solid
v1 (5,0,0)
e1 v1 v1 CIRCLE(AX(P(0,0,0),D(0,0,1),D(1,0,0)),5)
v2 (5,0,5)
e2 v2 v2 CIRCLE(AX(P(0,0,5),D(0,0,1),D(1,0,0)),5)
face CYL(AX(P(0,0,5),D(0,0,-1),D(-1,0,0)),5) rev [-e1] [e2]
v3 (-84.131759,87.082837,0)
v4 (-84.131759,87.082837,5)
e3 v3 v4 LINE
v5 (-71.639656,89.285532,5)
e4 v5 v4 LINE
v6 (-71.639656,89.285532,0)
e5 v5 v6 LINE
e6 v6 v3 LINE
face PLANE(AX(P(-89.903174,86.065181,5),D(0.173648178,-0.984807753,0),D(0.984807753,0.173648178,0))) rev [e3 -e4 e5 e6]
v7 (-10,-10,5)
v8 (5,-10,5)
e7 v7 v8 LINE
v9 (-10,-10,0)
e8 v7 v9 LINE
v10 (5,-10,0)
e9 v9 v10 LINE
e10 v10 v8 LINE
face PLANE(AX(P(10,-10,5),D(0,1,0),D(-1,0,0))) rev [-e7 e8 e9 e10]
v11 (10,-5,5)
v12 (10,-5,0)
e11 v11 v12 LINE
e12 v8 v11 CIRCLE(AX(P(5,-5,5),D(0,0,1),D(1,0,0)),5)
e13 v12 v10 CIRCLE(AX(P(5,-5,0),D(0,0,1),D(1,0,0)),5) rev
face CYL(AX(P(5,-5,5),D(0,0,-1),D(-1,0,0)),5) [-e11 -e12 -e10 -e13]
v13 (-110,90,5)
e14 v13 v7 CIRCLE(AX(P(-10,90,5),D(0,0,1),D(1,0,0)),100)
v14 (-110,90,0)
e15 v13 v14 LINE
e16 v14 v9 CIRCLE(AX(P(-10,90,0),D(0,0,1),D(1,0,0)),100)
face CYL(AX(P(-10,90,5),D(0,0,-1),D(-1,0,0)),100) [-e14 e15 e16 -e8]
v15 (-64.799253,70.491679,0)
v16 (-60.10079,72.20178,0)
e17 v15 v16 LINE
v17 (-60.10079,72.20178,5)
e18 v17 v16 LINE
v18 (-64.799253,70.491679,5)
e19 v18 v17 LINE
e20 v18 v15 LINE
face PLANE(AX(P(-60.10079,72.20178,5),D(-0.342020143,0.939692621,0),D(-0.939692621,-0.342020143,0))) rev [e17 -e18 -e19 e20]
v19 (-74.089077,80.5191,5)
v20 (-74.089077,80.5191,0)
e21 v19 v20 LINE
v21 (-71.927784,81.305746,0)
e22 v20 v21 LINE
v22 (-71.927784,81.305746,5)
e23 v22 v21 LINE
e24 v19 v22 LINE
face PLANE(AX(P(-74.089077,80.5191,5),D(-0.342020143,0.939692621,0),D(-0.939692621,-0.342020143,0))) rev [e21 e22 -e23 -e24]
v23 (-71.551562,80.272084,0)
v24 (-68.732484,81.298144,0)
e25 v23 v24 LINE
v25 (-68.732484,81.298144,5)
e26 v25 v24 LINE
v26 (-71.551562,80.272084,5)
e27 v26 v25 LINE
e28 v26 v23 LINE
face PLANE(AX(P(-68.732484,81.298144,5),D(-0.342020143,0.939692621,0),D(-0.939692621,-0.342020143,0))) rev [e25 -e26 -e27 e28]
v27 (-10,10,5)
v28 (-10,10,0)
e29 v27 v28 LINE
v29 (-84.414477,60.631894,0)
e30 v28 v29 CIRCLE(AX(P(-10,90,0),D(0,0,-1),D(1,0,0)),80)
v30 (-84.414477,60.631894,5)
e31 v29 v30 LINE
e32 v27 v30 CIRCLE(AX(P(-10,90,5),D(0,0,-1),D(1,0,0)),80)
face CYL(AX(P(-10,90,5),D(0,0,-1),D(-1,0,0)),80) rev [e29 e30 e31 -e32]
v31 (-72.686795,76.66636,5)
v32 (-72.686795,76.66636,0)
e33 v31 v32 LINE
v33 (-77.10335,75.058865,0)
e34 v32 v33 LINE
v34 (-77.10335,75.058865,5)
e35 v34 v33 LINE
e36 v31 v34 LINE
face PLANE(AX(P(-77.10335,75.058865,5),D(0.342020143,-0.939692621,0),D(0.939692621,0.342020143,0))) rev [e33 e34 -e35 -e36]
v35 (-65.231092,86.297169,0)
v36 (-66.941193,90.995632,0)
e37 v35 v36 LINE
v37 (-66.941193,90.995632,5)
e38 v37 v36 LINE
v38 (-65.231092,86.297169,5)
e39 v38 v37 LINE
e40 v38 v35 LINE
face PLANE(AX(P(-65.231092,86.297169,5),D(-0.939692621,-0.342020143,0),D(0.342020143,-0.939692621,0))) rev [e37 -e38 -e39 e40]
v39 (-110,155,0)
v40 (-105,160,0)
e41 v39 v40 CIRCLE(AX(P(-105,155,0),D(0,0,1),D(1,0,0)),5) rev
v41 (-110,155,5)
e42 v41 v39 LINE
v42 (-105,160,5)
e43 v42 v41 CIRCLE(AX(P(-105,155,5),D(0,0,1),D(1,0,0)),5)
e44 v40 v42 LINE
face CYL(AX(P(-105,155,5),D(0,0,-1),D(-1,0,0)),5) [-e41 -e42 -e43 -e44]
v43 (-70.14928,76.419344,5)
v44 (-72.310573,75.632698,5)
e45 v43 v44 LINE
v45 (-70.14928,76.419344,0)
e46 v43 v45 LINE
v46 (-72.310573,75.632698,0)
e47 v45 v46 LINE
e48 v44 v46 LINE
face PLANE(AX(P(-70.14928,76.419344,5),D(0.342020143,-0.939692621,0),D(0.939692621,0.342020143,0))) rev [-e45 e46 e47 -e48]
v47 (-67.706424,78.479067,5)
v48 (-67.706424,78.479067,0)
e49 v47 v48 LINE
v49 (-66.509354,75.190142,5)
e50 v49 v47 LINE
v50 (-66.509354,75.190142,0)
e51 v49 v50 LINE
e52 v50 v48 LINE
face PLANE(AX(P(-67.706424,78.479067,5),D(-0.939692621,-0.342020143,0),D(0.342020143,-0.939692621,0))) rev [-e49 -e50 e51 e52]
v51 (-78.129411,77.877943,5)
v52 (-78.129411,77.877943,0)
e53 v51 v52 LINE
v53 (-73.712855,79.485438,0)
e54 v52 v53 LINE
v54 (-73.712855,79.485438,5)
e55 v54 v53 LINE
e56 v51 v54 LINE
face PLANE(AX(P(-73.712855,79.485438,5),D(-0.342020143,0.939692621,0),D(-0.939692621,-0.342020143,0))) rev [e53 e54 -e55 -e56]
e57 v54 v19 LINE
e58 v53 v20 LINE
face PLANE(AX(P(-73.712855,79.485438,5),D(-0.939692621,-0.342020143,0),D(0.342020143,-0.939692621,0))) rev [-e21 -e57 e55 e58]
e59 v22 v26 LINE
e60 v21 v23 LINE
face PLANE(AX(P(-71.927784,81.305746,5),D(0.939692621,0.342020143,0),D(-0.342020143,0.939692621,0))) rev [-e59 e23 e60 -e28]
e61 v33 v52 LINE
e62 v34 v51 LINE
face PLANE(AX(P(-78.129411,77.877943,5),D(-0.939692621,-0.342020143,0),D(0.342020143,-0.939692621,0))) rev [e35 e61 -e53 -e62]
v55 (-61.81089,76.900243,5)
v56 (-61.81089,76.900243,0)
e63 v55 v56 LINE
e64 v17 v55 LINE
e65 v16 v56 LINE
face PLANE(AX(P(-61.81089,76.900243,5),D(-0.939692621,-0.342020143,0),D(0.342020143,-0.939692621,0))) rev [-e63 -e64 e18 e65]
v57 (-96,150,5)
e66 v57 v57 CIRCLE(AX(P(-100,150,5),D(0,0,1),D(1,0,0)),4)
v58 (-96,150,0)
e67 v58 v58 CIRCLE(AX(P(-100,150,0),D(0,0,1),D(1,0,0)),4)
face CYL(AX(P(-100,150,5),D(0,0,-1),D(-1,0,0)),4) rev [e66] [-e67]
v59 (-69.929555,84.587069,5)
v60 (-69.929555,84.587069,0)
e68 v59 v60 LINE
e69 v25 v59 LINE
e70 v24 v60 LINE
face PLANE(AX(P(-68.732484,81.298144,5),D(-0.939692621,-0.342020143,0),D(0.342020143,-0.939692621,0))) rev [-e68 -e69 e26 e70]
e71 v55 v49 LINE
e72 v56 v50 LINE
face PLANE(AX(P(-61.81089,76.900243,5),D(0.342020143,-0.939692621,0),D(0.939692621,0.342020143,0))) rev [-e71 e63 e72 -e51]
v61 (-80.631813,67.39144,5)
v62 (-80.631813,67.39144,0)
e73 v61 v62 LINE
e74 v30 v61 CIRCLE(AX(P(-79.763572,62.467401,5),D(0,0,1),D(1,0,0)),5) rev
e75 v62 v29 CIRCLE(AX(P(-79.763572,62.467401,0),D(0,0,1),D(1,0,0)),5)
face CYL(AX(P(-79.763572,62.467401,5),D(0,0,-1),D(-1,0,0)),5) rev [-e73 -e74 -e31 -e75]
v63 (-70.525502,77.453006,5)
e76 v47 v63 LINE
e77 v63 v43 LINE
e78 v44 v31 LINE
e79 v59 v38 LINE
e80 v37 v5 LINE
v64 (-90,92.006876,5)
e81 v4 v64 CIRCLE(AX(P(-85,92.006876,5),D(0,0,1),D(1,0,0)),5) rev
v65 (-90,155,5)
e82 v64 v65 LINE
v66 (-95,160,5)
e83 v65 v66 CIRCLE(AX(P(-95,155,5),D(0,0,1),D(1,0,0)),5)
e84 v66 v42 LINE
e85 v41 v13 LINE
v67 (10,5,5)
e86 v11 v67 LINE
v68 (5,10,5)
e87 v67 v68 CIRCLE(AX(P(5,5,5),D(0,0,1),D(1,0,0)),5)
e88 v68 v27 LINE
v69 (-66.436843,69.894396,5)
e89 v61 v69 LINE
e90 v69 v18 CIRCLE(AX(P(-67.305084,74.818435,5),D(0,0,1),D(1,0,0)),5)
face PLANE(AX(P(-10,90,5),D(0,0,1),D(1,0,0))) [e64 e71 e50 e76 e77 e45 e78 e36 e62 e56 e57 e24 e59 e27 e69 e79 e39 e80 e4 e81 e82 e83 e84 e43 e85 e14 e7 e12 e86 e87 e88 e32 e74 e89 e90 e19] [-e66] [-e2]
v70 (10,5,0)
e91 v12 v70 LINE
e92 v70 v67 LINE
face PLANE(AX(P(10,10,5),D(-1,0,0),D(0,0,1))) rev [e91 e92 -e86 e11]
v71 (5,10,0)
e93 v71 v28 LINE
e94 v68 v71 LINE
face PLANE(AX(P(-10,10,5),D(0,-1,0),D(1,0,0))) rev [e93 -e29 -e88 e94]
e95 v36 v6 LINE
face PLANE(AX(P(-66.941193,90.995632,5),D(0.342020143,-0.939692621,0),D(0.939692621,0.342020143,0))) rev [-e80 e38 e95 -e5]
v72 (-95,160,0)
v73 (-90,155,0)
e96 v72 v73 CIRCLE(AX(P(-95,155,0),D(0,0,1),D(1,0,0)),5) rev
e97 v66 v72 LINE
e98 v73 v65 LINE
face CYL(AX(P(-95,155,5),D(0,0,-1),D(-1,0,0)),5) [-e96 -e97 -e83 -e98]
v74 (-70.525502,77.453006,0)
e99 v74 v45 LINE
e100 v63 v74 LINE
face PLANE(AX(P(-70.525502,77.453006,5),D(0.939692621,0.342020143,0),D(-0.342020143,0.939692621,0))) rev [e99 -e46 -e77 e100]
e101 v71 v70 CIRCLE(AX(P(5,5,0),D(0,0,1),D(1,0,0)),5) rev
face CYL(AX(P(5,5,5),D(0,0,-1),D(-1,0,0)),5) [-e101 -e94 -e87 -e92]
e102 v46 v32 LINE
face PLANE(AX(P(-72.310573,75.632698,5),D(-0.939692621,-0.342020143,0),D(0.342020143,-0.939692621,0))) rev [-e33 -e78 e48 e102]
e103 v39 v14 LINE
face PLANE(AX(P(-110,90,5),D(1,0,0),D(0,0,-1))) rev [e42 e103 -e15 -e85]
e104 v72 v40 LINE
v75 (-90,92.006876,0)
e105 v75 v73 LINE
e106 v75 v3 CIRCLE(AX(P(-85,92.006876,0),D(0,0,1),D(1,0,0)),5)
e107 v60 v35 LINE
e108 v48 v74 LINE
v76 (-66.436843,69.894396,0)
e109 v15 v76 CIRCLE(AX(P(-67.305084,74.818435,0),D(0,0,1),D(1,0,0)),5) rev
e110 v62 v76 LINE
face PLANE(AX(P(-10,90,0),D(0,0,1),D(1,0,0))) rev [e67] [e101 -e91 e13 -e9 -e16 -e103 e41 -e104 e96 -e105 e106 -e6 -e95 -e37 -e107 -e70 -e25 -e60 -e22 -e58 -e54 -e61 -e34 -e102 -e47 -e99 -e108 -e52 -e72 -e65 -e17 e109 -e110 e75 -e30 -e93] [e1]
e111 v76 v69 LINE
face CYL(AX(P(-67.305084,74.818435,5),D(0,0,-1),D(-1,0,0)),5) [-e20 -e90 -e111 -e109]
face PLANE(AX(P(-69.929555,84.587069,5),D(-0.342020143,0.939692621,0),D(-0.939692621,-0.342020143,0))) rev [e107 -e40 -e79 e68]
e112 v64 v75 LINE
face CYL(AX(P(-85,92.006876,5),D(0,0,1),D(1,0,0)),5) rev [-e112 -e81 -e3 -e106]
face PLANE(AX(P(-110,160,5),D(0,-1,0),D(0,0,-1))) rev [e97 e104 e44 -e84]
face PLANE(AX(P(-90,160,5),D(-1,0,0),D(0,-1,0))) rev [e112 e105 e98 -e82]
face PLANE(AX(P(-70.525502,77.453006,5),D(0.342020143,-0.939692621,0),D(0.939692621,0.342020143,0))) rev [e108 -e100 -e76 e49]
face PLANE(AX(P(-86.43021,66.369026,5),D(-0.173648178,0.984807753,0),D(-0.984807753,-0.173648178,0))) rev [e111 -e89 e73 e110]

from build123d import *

# Parameters (mm, degrees)
SKETCH1_R           = 5
SKETCH1_R_2         = 4
BOSS_EXTRUDE1_DEPTH = 5
FILLET3_R           = 5


with BuildPart() as part:
    # Sketch1 → Boss-Extrude1 (new body)
    with BuildSketch(Plane.XY):
        with BuildLine():
            Line((-10, 10), (10, 10))
            Line((10, 10), (10, -10))
            Line((10, -10), (-10, -10))
            ThreePointArc((-10, -10), (-80.710678119, 19.289321881), (-110, 90))
            Line((-110, 90), (-110, 160))
            Line((-110, 160), (-90, 160))
            Line((-90, 160), (-90, 90))
            ThreePointArc((-90, 90), (-89.975789808, 88.031994787), (-89.903173887, 86.065180718))
            Line((-89.903173887, 86.065180718), (-71.639655664, 89.285531744))
            Line((-71.639655664, 89.285531744), (-66.94119256, 90.99563246))
            Line((-66.94119256, 90.99563246), (-65.231091843, 86.297169356))
            Line((-65.231091843, 86.297169356), (-69.929554947, 84.58706864))
            Line((-69.929554947, 84.58706864), (-68.732484445, 81.298144467))
            Line((-68.732484445, 81.298144467), (-71.551562308, 80.272084037))
            Line((-71.551562308, 80.272084037), (-71.927784465, 81.30574592))
            Line((-71.927784465, 81.30574592), (-74.089077493, 80.51909959))
            Line((-74.089077493, 80.51909959), (-73.712855336, 79.485437707))
            Line((-73.712855336, 79.485437707), (-78.129410653, 77.877943034))
            Line((-78.129410653, 77.877943034), (-77.103350223, 75.058865171))
            Line((-77.103350223, 75.058865171), (-72.686794906, 76.666359845))
            Line((-72.686794906, 76.666359845), (-72.310572748, 75.632697962))
            Line((-72.310572748, 75.632697962), (-70.14927972, 76.419344292))
            Line((-70.14927972, 76.419344292), (-70.525501878, 77.453006175))
            Line((-70.525501878, 77.453006175), (-67.706424015, 78.479066605))
            Line((-67.706424015, 78.479066605), (-66.509353514, 75.190142432))
            Line((-66.509353514, 75.190142432), (-61.81089041, 76.900243149))
            Line((-61.81089041, 76.900243149), (-60.100789693, 72.201780045))
            Line((-60.100789693, 72.201780045), (-64.799252797, 70.491679328))
            Line((-64.799252797, 70.491679328), (-64.693728557, 70.201753861))
            Line((-64.693728557, 70.201753861), (-86.430210334, 66.369025658))
            ThreePointArc((-86.430210334, 66.369025658), (-57.484324006, 25.616469702), (-10, 10))
        make_face()
        Circle(SKETCH1_R, mode=Mode.SUBTRACT)
        with Locations((-100, 150)):
            Circle(SKETCH1_R_2, mode=Mode.SUBTRACT)
    extrude(amount=BOSS_EXTRUDE1_DEPTH)

    # Fillet3
    # the kernel refuses this fillet: 5 mm, written as the material it adds along each edge
    with BuildSketch(Plane(origin=(-86.430210334, 66.369025658, 0), x_dir=(0.9848077530122086, 0.17364817766692744, 0), z_dir=(0, 0, 1))) as fillet3_piece_1:
        with BuildLine():
            CenterArc((5.887847048, -5), FILLET3_R, 90, 101.536959033)
            ThreePointArc((0.988867563, -6), (0.437404346, -3.009399093), (0, 0))
            Line((0, 0), (5.887847048, 0))
        make_face()
    extrude(amount=5)
    with BuildSketch(Plane(origin=(-89.903173887, 86.065180718, 0), x_dir=(-0.01629387917599103, 0.9998672459388787, 0), z_dir=(0, 0, 1))) as fillet3_piece_2:
        with BuildLine():
            CenterArc((5.8610144, -4.99933623), FILLET3_R, 89.066388177, 100)
            Line((0.923482309, -5.787230163), (0.4297291, -5.866019556))
            Line((0.4297291, -5.866019556), (-0.493753209, -0.078789393))
            Line((-0.493753209, -0.078789393), (-0.016452277, 0.499729249))
            ThreePointArc((-0.016452277, 0.499729249), (3.944021531, 0.532633412), (5.950630735, 0.499933623))
            Line((5.950630735, 0.499933623), (5.942483796, 0))
        make_face()
    extrude(amount=5)
    # the kernel refuses this fillet: 5 mm, written as the material it takes off along each edge
    with BuildSketch(Plane(origin=(10, -10, -12.5), x_dir=(0, 1, 0), z_dir=(0, 0, 1)), Plane(origin=(10, 10, -12.5), x_dir=(-1, 0, 0), z_dir=(0, 0, 1))) as fillet3_2_piece_1:
        with BuildLine():
            CenterArc((FILLET3_R, FILLET3_R), FILLET3_R, 180, 90)
            Line((0, FILLET3_R), (0, 0))
            Line((0, 0), (FILLET3_R, 0))
        make_face()
    extrude(amount=30, mode=Mode.SUBTRACT)
    with BuildSketch(Plane(origin=(-90, 160, -12.5), x_dir=(0, -1, 0), z_dir=(0, 0, 1)), Plane(origin=(-110, 160, -12.5), x_dir=(1, 0, 0), z_dir=(0, 0, 1))) as fillet3_2_piece_2:
        with BuildLine():
            CenterArc((FILLET3_R, -FILLET3_R), FILLET3_R, 90, 90)
            Line((0, -FILLET3_R), (0, 0))
            Line((0, 0), (FILLET3_R, 0))
        make_face()
    extrude(amount=30, mode=Mode.SUBTRACT)
    with BuildSketch(Plane(origin=(-64.693728557, 70.201753861, -4.425012024), x_dir=(-0.9848077530122087, -0.17364817766692653, 0), z_dir=(0, 0, 1))) as fillet3_2_piece_3:
        with BuildLine():
            CenterArc((1.77000481, -5), FILLET3_R, 90, 20.077186637)
            Line((0.053576061, -0.30384494), (0, 0))
            Line((0, 0), (1.77000481, 0))
        make_face()
    extrude(amount=13.850024049, mode=Mode.SUBTRACT)


solid = part.part
